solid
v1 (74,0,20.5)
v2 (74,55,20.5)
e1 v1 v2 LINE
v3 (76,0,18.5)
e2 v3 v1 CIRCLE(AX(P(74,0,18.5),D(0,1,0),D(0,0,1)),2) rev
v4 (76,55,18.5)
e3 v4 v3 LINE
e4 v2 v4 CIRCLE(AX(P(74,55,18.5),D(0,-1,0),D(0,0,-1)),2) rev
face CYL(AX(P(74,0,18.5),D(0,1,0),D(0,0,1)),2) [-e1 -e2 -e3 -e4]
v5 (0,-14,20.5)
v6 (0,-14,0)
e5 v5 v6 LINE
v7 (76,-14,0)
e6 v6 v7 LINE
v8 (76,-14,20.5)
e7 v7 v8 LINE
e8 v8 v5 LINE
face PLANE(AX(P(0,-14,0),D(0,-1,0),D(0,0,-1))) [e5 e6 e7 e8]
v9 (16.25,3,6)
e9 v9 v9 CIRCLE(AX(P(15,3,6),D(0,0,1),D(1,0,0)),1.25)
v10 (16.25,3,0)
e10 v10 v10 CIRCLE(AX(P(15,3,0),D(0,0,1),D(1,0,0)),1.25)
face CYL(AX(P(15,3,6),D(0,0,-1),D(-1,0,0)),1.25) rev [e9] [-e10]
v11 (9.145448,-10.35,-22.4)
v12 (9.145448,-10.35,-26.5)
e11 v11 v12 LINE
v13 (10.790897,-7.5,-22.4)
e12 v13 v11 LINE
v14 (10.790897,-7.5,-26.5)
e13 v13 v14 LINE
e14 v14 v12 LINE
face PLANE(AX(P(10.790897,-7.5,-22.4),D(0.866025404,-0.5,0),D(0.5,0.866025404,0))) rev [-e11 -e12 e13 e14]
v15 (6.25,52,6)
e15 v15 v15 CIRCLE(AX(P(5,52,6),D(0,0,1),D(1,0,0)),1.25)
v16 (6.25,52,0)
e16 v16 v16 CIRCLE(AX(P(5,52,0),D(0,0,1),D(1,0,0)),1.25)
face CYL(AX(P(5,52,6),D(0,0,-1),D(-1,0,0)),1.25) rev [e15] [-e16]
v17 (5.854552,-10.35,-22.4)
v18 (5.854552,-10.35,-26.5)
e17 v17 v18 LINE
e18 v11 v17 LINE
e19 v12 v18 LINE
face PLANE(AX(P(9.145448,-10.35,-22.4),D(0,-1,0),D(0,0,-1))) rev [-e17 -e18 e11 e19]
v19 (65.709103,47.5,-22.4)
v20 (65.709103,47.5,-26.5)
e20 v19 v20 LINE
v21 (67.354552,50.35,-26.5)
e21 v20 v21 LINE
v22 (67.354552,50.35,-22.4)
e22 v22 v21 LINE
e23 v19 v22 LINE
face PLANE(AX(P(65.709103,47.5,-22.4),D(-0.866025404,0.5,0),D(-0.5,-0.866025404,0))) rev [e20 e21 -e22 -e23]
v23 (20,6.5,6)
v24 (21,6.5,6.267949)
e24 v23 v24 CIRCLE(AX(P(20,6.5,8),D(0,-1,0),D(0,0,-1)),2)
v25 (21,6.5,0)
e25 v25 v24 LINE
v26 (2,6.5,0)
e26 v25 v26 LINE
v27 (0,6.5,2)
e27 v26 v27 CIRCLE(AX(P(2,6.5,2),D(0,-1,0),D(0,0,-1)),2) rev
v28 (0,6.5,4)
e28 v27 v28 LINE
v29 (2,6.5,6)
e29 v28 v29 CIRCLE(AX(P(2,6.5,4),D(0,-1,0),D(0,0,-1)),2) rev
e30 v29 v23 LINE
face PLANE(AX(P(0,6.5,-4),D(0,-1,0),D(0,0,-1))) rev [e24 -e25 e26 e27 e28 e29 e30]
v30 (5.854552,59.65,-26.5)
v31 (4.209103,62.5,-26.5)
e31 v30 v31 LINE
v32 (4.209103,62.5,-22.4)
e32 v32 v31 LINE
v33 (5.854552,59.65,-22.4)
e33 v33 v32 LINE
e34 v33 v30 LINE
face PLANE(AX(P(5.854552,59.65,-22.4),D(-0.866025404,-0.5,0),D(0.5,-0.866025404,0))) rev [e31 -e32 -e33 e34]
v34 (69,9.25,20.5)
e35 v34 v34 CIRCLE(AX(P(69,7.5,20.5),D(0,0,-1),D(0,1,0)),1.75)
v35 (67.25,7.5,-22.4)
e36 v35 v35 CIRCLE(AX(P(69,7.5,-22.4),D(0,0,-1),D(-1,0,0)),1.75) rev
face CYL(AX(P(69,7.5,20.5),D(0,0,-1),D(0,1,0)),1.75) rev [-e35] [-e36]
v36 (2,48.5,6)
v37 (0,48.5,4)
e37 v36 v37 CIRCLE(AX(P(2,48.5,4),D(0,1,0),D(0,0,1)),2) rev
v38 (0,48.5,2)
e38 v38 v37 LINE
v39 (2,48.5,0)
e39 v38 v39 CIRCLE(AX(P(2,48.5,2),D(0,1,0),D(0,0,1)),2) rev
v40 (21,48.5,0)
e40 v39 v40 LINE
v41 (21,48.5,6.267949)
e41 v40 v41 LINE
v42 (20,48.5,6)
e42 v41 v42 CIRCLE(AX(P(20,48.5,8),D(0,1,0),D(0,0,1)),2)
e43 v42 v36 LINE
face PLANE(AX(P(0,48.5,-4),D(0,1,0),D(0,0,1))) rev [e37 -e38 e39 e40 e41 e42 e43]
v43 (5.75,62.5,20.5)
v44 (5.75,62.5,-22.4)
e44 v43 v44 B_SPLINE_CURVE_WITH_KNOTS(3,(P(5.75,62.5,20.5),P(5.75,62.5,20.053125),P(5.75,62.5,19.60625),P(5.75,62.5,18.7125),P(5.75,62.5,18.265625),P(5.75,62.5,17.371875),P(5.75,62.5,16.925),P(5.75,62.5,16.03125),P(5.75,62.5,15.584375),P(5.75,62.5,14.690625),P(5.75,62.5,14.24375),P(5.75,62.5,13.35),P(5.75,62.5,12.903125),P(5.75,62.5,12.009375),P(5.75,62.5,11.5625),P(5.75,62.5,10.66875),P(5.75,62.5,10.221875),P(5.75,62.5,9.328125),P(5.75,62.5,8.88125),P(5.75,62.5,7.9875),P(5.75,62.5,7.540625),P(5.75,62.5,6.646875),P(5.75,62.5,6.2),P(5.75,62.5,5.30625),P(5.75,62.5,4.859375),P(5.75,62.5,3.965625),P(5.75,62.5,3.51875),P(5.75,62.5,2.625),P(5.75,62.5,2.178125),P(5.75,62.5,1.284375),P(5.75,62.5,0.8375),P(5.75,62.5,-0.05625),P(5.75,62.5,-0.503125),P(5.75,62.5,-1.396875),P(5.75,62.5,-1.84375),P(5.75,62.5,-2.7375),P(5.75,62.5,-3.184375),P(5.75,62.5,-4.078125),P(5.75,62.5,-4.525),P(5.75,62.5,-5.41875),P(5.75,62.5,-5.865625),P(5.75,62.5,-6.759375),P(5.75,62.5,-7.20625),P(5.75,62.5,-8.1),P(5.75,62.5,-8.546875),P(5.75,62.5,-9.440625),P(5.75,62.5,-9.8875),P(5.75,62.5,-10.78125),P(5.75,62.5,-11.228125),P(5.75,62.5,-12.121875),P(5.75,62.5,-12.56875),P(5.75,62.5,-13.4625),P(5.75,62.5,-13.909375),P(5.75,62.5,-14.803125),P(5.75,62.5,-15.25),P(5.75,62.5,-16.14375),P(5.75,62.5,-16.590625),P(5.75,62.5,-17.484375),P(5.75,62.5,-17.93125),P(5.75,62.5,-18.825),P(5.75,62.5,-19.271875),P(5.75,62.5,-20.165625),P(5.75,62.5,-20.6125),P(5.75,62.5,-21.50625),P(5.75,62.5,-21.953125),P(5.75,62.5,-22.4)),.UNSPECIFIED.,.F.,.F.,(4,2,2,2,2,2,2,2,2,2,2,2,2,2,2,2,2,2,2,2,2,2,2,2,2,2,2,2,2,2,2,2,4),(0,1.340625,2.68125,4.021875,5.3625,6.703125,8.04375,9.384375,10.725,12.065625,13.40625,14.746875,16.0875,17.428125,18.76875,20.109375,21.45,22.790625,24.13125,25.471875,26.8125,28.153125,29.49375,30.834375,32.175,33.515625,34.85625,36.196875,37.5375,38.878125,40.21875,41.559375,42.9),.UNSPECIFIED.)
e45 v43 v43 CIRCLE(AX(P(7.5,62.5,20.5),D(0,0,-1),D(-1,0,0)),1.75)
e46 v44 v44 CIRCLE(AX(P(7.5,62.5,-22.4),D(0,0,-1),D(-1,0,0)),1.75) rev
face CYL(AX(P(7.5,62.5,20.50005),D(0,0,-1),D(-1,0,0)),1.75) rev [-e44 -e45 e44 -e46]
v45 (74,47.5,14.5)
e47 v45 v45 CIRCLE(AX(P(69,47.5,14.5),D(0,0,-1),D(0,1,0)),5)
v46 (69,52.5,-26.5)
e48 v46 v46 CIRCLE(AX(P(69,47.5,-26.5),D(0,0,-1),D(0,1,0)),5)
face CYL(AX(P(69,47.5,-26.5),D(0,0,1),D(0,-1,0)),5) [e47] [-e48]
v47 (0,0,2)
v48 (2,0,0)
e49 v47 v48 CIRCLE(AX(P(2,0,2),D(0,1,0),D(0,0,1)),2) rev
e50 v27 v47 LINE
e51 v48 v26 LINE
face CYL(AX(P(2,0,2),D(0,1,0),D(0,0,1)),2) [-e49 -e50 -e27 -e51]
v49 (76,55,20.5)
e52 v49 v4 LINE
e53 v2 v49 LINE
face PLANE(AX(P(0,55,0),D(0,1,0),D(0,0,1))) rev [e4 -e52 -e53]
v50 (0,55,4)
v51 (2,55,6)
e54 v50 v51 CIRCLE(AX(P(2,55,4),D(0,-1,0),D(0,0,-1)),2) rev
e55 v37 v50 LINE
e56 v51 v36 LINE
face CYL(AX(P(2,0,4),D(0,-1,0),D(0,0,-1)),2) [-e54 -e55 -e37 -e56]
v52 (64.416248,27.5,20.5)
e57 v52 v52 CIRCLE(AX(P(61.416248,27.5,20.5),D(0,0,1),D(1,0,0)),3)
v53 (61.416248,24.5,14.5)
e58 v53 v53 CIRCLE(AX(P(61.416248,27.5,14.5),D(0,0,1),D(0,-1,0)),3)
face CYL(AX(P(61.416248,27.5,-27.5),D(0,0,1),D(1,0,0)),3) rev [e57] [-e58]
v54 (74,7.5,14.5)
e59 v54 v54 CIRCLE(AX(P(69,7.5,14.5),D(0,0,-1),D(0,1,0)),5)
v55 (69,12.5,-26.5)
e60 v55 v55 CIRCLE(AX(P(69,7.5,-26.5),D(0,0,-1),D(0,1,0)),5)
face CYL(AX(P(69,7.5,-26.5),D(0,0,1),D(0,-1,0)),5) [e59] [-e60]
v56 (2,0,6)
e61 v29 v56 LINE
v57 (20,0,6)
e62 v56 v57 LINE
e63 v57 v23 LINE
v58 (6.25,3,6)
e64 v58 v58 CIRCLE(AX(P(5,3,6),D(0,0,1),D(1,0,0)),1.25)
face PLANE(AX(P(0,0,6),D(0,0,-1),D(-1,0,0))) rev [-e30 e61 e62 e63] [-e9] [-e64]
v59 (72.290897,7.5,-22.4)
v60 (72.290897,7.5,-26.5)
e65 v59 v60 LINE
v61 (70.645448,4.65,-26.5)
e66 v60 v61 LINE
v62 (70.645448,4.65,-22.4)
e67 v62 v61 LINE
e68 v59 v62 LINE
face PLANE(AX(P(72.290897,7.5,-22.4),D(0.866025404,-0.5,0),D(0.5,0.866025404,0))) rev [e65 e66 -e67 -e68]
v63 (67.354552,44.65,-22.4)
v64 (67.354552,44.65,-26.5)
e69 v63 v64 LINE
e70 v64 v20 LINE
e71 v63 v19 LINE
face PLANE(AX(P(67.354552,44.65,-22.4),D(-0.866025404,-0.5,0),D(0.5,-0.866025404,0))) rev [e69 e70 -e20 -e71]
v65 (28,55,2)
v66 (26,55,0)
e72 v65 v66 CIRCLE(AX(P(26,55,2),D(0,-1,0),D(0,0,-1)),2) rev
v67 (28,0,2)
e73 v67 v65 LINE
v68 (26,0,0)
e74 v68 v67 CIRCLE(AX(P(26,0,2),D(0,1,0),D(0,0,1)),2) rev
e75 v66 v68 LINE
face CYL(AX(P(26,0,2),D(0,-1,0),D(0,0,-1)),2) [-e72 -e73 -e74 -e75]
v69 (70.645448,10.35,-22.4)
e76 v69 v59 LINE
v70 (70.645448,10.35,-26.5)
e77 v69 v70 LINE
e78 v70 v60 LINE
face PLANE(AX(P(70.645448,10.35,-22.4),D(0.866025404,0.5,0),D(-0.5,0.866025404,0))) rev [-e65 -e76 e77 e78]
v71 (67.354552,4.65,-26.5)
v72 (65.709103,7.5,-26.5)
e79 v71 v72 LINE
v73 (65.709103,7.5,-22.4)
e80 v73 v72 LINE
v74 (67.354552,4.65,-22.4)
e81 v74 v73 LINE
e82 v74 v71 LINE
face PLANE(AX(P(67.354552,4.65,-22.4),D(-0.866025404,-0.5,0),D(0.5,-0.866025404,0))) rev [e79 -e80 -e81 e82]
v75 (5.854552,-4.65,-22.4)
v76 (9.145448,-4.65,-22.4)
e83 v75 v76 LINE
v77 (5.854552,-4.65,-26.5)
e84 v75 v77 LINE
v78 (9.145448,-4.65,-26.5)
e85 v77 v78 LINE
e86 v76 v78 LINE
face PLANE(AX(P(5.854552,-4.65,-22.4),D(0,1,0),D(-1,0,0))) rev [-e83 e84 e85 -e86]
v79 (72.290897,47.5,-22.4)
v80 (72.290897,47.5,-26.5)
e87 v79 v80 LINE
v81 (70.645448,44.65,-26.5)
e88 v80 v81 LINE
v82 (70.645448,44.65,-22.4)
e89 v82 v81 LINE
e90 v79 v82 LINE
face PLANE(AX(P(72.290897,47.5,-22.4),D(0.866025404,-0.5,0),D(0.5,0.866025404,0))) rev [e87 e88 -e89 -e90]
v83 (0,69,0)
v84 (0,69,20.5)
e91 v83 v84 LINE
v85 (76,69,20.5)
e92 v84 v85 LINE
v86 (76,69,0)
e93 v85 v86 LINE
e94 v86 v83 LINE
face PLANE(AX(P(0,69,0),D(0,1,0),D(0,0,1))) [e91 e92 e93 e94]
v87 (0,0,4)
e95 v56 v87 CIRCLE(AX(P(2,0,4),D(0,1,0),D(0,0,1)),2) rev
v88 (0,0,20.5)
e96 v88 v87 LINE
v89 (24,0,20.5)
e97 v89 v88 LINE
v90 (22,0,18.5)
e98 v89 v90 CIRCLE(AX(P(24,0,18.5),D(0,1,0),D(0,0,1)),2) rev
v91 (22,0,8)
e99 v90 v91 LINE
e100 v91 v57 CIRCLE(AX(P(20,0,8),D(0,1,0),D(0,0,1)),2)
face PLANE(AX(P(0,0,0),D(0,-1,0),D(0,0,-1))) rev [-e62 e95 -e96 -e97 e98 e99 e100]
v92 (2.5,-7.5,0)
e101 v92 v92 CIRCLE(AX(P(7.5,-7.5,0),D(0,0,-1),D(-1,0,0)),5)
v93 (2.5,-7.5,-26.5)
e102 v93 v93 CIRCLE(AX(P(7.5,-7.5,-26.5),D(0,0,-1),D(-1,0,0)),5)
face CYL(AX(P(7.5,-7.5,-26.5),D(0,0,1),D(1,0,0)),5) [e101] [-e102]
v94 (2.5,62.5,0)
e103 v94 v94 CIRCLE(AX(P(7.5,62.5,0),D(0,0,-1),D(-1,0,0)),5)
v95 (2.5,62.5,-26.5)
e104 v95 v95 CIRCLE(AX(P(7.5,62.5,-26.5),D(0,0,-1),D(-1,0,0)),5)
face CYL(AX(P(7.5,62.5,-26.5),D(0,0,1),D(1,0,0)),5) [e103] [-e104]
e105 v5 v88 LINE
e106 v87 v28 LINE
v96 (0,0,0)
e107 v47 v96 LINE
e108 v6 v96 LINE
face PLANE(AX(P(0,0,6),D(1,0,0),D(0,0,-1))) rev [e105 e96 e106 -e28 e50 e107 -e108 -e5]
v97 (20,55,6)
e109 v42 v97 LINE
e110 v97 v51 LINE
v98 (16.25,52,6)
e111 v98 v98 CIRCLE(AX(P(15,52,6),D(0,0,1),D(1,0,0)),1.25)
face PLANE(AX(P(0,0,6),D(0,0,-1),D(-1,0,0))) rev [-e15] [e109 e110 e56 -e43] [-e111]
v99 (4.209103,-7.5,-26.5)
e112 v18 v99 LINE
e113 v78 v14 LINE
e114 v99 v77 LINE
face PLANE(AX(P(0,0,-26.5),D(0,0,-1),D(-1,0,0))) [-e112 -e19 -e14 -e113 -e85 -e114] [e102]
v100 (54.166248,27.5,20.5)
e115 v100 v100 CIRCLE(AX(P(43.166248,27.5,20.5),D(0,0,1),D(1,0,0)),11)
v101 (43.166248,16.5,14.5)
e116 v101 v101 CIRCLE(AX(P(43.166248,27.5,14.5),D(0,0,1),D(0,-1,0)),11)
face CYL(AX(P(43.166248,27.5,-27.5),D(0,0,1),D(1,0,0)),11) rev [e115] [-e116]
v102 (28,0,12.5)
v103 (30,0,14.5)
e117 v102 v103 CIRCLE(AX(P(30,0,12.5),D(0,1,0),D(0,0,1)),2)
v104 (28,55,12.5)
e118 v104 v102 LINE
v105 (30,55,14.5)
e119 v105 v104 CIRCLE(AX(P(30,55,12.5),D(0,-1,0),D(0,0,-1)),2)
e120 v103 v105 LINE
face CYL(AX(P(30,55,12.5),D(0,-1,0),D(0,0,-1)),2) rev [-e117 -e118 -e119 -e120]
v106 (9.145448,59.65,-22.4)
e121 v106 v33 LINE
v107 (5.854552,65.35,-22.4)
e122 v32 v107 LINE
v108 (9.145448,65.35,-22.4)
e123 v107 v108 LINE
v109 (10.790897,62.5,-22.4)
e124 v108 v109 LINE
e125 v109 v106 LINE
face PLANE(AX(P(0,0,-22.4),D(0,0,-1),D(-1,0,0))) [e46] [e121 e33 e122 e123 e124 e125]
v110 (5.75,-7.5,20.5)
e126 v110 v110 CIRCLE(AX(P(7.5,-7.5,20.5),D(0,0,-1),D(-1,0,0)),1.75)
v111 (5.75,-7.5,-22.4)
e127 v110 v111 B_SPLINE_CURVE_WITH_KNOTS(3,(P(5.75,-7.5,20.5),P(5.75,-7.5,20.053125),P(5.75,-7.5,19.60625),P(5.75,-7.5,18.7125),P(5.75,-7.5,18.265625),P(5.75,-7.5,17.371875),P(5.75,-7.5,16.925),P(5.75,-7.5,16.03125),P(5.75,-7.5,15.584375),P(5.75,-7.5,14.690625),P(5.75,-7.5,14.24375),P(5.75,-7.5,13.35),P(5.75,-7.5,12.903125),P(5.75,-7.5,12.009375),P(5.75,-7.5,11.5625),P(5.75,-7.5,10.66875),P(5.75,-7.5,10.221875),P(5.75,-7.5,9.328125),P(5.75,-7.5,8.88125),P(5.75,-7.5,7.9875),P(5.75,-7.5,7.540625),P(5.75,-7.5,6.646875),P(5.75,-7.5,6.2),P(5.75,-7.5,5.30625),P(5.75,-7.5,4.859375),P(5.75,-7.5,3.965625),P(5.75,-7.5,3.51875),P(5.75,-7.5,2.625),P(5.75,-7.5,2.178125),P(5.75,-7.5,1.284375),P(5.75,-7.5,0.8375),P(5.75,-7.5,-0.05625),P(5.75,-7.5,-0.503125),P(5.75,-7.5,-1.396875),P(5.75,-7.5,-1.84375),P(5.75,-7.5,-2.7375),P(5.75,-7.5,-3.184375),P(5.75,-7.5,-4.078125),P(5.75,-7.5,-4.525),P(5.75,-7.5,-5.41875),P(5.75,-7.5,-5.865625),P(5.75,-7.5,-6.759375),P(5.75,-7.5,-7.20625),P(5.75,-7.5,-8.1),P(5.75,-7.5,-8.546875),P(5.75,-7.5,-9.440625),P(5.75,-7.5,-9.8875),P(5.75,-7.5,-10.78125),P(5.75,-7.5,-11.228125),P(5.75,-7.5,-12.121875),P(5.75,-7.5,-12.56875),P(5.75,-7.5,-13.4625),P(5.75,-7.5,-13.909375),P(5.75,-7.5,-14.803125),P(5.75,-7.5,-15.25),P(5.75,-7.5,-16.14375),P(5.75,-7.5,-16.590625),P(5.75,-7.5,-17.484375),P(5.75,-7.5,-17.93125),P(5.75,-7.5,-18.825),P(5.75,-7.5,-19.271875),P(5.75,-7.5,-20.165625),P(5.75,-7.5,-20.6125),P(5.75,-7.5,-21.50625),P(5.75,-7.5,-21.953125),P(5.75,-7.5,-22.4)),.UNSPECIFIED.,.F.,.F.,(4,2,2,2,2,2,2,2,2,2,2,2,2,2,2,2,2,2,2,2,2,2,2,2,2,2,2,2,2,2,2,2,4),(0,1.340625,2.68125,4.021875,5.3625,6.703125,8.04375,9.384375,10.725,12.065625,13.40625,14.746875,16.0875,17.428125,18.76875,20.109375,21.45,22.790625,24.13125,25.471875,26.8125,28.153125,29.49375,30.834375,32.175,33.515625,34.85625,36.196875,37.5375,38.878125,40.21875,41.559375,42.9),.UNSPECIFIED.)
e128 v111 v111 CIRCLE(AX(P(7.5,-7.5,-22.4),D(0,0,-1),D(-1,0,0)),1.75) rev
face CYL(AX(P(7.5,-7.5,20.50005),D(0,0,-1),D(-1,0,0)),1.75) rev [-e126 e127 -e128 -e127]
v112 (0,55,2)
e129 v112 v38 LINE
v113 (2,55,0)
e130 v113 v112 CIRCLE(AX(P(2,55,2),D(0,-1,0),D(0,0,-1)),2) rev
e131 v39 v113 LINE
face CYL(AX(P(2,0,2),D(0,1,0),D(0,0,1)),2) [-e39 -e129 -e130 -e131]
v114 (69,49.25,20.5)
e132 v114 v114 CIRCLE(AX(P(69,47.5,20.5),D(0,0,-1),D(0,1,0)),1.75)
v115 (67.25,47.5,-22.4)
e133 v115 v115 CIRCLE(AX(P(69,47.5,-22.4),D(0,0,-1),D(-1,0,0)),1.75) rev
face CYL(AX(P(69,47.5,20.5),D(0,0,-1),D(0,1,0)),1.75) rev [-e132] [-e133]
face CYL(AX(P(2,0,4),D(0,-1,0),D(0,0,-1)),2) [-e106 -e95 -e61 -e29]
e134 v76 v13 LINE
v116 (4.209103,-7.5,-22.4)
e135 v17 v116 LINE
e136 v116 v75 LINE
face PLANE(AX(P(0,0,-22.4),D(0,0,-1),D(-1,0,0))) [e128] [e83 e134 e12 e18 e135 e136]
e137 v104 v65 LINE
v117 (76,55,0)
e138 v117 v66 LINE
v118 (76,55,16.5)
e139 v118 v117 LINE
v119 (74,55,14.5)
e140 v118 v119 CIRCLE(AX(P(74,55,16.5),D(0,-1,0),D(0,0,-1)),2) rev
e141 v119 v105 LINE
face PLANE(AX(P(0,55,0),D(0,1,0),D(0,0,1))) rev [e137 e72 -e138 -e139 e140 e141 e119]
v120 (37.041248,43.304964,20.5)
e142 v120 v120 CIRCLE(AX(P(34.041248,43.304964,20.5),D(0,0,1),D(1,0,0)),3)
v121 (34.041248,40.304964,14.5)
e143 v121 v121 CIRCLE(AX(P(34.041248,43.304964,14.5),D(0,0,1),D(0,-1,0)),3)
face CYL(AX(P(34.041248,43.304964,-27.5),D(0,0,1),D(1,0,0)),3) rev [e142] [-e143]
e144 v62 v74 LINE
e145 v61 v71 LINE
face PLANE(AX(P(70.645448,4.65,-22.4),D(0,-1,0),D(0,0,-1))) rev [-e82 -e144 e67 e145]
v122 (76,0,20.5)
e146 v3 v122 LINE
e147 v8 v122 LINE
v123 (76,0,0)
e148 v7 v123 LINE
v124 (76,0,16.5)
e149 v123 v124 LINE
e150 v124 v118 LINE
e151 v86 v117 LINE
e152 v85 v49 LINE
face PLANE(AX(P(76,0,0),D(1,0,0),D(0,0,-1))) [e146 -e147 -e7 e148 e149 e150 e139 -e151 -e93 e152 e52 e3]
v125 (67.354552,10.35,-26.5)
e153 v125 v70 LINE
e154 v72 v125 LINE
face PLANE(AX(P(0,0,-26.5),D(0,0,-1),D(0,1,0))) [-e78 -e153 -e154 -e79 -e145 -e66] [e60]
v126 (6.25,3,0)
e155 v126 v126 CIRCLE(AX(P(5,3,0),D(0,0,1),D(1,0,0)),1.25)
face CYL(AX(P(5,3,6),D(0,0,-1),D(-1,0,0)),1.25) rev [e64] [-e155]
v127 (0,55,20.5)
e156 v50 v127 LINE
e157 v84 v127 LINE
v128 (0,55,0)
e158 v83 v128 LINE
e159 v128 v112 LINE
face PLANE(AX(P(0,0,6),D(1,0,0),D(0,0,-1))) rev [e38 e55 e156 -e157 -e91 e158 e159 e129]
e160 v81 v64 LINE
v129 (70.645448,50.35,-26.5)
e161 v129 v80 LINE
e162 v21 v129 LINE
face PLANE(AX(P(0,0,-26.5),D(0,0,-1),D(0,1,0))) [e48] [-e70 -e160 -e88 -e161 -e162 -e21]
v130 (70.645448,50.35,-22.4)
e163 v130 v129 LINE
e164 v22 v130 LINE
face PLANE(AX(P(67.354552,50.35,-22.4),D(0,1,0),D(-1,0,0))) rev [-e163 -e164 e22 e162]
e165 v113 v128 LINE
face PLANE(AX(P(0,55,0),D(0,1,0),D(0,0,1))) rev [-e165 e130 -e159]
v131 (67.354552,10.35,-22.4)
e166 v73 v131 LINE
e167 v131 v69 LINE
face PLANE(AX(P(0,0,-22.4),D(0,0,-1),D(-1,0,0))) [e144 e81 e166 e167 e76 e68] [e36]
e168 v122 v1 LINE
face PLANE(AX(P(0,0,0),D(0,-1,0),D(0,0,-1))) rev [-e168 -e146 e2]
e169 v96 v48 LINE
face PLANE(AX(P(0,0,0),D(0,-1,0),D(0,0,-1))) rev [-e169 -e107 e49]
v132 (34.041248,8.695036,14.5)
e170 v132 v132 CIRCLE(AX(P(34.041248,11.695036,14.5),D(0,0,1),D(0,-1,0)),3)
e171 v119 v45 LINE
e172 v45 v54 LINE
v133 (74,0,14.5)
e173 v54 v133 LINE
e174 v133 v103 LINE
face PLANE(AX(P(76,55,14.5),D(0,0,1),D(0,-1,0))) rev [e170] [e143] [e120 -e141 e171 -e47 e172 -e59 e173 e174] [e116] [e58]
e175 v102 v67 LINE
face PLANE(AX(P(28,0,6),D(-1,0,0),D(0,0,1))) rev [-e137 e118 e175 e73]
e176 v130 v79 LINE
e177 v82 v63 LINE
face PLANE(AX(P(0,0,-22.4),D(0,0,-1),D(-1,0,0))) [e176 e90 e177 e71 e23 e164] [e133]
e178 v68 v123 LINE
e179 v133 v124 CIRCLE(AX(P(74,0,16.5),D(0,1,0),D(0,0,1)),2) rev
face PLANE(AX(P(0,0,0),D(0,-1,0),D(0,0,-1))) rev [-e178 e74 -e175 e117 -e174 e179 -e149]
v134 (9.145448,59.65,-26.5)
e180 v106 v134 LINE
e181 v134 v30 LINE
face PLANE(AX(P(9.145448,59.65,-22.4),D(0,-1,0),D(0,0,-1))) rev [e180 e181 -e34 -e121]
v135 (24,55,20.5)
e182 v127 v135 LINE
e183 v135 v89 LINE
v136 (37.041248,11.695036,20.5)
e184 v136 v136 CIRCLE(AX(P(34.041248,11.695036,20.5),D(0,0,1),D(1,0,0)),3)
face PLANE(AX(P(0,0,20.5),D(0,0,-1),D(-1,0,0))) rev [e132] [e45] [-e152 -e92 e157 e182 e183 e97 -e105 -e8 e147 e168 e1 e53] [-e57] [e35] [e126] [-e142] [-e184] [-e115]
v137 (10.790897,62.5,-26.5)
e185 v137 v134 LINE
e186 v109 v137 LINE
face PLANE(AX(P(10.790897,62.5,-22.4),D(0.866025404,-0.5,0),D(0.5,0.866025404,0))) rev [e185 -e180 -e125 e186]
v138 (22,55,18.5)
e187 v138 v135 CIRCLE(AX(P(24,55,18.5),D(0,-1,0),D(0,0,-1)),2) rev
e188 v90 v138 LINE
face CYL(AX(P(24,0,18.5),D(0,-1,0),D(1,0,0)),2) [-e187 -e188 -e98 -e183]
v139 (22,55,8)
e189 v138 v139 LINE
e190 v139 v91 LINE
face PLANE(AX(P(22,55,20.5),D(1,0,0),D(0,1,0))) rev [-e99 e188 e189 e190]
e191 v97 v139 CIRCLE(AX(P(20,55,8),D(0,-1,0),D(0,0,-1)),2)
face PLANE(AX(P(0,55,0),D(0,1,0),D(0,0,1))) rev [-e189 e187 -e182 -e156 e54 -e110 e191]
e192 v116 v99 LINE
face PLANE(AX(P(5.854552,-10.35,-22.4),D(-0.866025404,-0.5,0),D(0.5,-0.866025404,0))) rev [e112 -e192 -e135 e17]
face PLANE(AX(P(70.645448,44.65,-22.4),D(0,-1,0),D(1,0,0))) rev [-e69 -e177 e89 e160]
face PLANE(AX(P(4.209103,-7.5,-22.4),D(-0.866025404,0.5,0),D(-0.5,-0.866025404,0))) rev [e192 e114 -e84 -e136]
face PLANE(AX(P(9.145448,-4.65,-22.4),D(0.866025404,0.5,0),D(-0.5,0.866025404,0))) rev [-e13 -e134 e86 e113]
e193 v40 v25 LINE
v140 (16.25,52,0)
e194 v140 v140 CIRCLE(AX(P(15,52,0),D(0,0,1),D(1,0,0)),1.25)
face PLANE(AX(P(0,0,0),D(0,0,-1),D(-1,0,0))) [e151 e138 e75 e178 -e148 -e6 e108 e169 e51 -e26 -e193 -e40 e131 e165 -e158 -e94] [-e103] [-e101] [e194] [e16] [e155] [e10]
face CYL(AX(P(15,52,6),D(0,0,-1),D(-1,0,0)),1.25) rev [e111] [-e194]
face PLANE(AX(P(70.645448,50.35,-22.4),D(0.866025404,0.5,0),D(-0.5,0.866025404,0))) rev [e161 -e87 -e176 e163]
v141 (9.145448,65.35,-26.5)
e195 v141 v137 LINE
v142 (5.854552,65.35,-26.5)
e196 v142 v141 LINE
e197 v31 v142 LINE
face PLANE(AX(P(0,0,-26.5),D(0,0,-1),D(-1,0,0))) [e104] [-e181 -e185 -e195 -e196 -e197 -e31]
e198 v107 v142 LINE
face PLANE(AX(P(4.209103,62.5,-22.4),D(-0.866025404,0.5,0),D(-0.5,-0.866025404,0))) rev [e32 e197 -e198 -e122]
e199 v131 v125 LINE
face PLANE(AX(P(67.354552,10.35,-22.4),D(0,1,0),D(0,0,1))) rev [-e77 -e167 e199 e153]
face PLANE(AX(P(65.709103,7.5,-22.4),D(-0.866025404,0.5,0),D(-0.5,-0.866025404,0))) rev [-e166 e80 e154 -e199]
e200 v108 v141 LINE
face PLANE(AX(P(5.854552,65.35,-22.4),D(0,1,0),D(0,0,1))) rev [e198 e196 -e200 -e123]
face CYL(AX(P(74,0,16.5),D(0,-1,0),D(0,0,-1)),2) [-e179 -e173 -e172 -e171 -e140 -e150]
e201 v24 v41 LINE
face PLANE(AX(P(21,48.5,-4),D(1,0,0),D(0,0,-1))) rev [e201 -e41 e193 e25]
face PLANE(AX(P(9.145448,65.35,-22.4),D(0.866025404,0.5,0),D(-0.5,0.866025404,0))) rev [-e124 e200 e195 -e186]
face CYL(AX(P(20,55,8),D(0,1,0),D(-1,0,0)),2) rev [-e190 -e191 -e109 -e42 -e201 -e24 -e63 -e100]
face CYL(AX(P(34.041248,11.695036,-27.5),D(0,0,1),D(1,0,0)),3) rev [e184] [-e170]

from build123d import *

# Parameters (mm, degrees)
SKETCH1_W               = 28
SKETCH1_H               = 55
SKETCH1_R               = 1.25
BOSS_EXTRUDE1_DEPTH     = 6
SKETCH2_W               = 6
SKETCH2_H               = 55
BOSS_EXTRUDE2_DEPTH     = 14.5
SKETCH3_W               = 6
SKETCH3_H               = 55
BOSS_EXTRUDE3_DEPTH     = 48
SKETCH4_R               = 3
SKETCH4_R_2             = 11
CUT_EXTRUDE1_DEPTH      = 48
FILLET4_R               = 2
SKETCH5_W               = 21
SKETCH5_H               = 42
CUT_EXTRUDE2_DEPTH      = 10
FILLET5_R               = 2
ESQUISSE2_R             = 5
BOSS_EXTRU_3_DEPTH      = 41
ESQUISSE3_R             = 1.75
ENL_V_MAT_EXTRU_1_DEPTH = 105.928547117
ESQUISSE4_W             = 76
ESQUISSE4_H             = 20.5
BOSS_EXTRU_4_DEPTH      = 14
ESQUISSE5_W             = 76
ESQUISSE5_H             = 20.5
BOSS_EXTRU_5_DEPTH      = 14
ESQUISSE7_R             = 5
BOSS_EXTRU_8_DEPTH      = 26.5
ESQUISSE10_R            = 1.75
ENL_V_MAT_EXTRU_2_DEPTH = 113.898184219
ENL_V_MAT_EXTRU_3_DEPTH = 4.1
ENL_V_MAT_EXTRU_4_DEPTH = 4.1


with BuildPart() as part:
    # Sketch1 → Boss-Extrude1 (new body)
    with BuildSketch(Plane.XY):
        with Locations((14, 27.5)):
            Rectangle(SKETCH1_W, SKETCH1_H)
        with Locations((5, 52)):
            Circle(SKETCH1_R, mode=Mode.SUBTRACT)
        with Locations((15, 52)):
            Circle(SKETCH1_R, mode=Mode.SUBTRACT)
        with Locations((5, 3)):
            Circle(SKETCH1_R, mode=Mode.SUBTRACT)
        with Locations((15, 3)):
            Circle(SKETCH1_R, mode=Mode.SUBTRACT)
    extrude(amount=BOSS_EXTRUDE1_DEPTH)

    # Sketch2 → Boss-Extrude2 (add)
    with BuildSketch(Plane.XY.offset(6)):
        with Locations((25, 27.5)):
            Rectangle(SKETCH2_W, SKETCH2_H)
    extrude(amount=BOSS_EXTRUDE2_DEPTH)

    # Sketch3 → Boss-Extrude3 (add)
    with BuildSketch(Plane(origin=(28, 0, 0), x_dir=(0, 0, -1), z_dir=(1, 0, 0))):
        with Locations((-17.5, 27.5)):
            Rectangle(SKETCH3_W, SKETCH3_H)
    extrude(amount=BOSS_EXTRUDE3_DEPTH)

    # Sketch4 → Cut-Extrude1 (cut)
    with BuildSketch(Plane.XY.offset(20.5)):
        with Locations((61.416247904, 27.5)):
            Circle(SKETCH4_R)
        with Locations((34.041247904, 11.695036381)):
            Circle(SKETCH4_R)
        with Locations((34.041247904, 43.304963619)):
            Circle(SKETCH4_R)
        with Locations((43.166247904, 27.5)):
            Circle(SKETCH4_R_2)
    extrude(amount=-CUT_EXTRUDE1_DEPTH, mode=Mode.SUBTRACT)

    # Fillet4
    fillet4_edges = [part.edges().sort_by_distance(p)[0] for p in [
        (22, 27.5, 20.5),
        (0, 27.5, 6),
        (0, 27.5, 0),
        (76, 27.5, 14.5),
        (28, 27.5, 14.5),
        (28, 27.5, 0),
        (76, 27.5, 20.5),
    ]]
    fillet(fillet4_edges, radius=FILLET4_R)

    # Sketch5 → Cut-Extrude2 (cut)
    with BuildSketch(Plane.XY.offset(6)):
        with Locations((10.5, 27.5)):
            Rectangle(SKETCH5_W, SKETCH5_H)
    extrude(amount=-CUT_EXTRUDE2_DEPTH, mode=Mode.SUBTRACT)

    # Fillet5
    # the kernel refuses this fillet: 2 mm, written as the material it adds along each edge
    with BuildSketch(Plane(origin=(22, 55, 6), x_dir=(-1, 0, 0), z_dir=(0, -1, 0))) as fillet5_piece_1_section:
        with BuildLine():
            CenterArc((FILLET5_R, -FILLET5_R), FILLET5_R, 90, 90)
            Line((0, -FILLET5_R), (0, 0))
            Line((0, 0), (FILLET5_R, 0))
        make_face()
    fillet5_piece_1 = extrude(amount=55, mode=Mode.PRIVATE)
    fillet5_piece_1 = split(fillet5_piece_1, bisect_by=Plane(origin=(21, 51.75, 6.048016763), z_dir=(-1, 0, 0)), keep=Keep.TOP, mode=Mode.PRIVATE)
    fillet5_piece_1 = split(fillet5_piece_1, bisect_by=Plane(origin=(20.673498431, 48.5, 6.048016763), z_dir=(0, 1, 0)), keep=Keep.TOP, mode=Mode.PRIVATE)
    add(fillet5_piece_1)
    with BuildSketch(Plane(origin=(22, 55, 6), x_dir=(-1, 0, 0), z_dir=(0, -1, 0))) as fillet5_piece_2_section:
        with BuildLine():
            CenterArc((FILLET5_R, -FILLET5_R), FILLET5_R, 90, 90)
            Line((0, -FILLET5_R), (0, 0))
            Line((0, 0), (FILLET5_R, 0))
        make_face()
    fillet5_piece_2 = extrude(amount=55, mode=Mode.PRIVATE)
    fillet5_piece_2 = split(fillet5_piece_2, bisect_by=Plane(origin=(21, 51.75, 6.51024012), z_dir=(1, 0, 0)), keep=Keep.TOP, mode=Mode.PRIVATE)
    fillet5_piece_2 = split(fillet5_piece_2, bisect_by=Plane(origin=(21.671216471, 48.5, 6.51024012), z_dir=(0, 1, 0)), keep=Keep.TOP, mode=Mode.PRIVATE)
    add(fillet5_piece_2)
    with BuildSketch(Plane(origin=(22, 55, 6), x_dir=(-1, 0, 0), z_dir=(0, -1, 0))) as fillet5_piece_3_section:
        with BuildLine():
            CenterArc((FILLET5_R, -FILLET5_R), FILLET5_R, 90, 90)
            Line((0, -FILLET5_R), (0, 0))
            Line((0, 0), (FILLET5_R, 0))
        make_face()
    fillet5_piece_3 = extrude(amount=55, mode=Mode.PRIVATE)
    fillet5_piece_3 = split(fillet5_piece_3, bisect_by=Plane(origin=(21.671216471, 6.5, 6.51024012), z_dir=(0, 1, 0)), keep=Keep.TOP, mode=Mode.PRIVATE)
    fillet5_piece_3 = split(fillet5_piece_3, bisect_by=Plane(origin=(21, 27.5, 6.51024012), z_dir=(1, 0, 0)), keep=Keep.TOP, mode=Mode.PRIVATE)
    fillet5_piece_3 = split(fillet5_piece_3, bisect_by=Plane(origin=(21.671216471, 48.5, 6.51024012), z_dir=(0, -1, 0)), keep=Keep.TOP, mode=Mode.PRIVATE)
    add(fillet5_piece_3)
    with BuildSketch(Plane(origin=(22, 55, 6), x_dir=(-1, 0, 0), z_dir=(0, -1, 0))) as fillet5_piece_4_section:
        with BuildLine():
            CenterArc((FILLET5_R, -FILLET5_R), FILLET5_R, 90, 90)
            Line((0, -FILLET5_R), (0, 0))
            Line((0, 0), (FILLET5_R, 0))
        make_face()
    fillet5_piece_4 = extrude(amount=55, mode=Mode.PRIVATE)
    fillet5_piece_4 = split(fillet5_piece_4, bisect_by=Plane(origin=(20.673498431, 6.5, 6.048016763), z_dir=(0, -1, 0)), keep=Keep.TOP, mode=Mode.PRIVATE)
    fillet5_piece_4 = split(fillet5_piece_4, bisect_by=Plane(origin=(21, 3.25, 6.048016763), z_dir=(-1, 0, 0)), keep=Keep.TOP, mode=Mode.PRIVATE)
    add(fillet5_piece_4)
    with BuildSketch(Plane(origin=(22, 55, 6), x_dir=(-1, 0, 0), z_dir=(0, -1, 0))) as fillet5_piece_5_section:
        with BuildLine():
            CenterArc((FILLET5_R, -FILLET5_R), FILLET5_R, 90, 90)
            Line((0, -FILLET5_R), (0, 0))
            Line((0, 0), (FILLET5_R, 0))
        make_face()
    fillet5_piece_5 = extrude(amount=55, mode=Mode.PRIVATE)
    fillet5_piece_5 = split(fillet5_piece_5, bisect_by=Plane(origin=(21.671216471, 6.5, 6.51024012), z_dir=(0, -1, 0)), keep=Keep.TOP, mode=Mode.PRIVATE)
    fillet5_piece_5 = split(fillet5_piece_5, bisect_by=Plane(origin=(21, 3.25, 6.51024012), z_dir=(1, 0, 0)), keep=Keep.TOP, mode=Mode.PRIVATE)
    add(fillet5_piece_5)

    # Esquisse2 → Boss.-Extru.3 (add)
    with BuildSketch(Plane(origin=(0, 0, 14.5), x_dir=(-1, 0, 0), z_dir=(0, 0, -1))):
        with Locations(Location((-69, 47.5, 0), (0, 0, 180))):
            Circle(ESQUISSE2_R)
        with Locations(Location((-69, 7.5, 0), (0, 0, 180))):
            Circle(ESQUISSE2_R)
    extrude(amount=BOSS_EXTRU_3_DEPTH)

    # Esquisse3 → Enlèv. mat.-Extru.1 (cut, through all)
    with BuildSketch(Plane(origin=(0, 0, -26.5), x_dir=(-1, 0, 0), z_dir=(0, 0, -1))):
        with Locations(Location((-69, 7.5, 0), (0, 0, 90))):
            Circle(ESQUISSE3_R)
        with Locations(Location((-69, 47.5, 0), (0, 0, 90))):
            Circle(ESQUISSE3_R)
    extrude(amount=-ENL_V_MAT_EXTRU_1_DEPTH, mode=Mode.SUBTRACT)

    # Esquisse4 → Boss.-Extru.4 (add)
    with BuildSketch(Plane(origin=(0, 55, 0), x_dir=(1, 0, 0), z_dir=(0, 1, 0))):
        with Locations((38, -10.25)):
            Rectangle(ESQUISSE4_W, ESQUISSE4_H)
    extrude(amount=BOSS_EXTRU_4_DEPTH)

    # Esquisse5 → Boss.-Extru.5 (add)
    with BuildSketch(Plane.XZ):
        with Locations((38, 10.25)):
            Rectangle(ESQUISSE5_W, ESQUISSE5_H)
    extrude(amount=BOSS_EXTRU_5_DEPTH)

    # Esquisse7 → Boss.-Extru.8 (add)
    with BuildSketch(Plane(origin=(0, 0, 0), x_dir=(-1, 0, 0), z_dir=(0, 0, -1))):
        with Locations((-7.5, -7.5)):
            Circle(ESQUISSE7_R)
        with Locations((-7.5, 62.5)):
            Circle(ESQUISSE7_R)
    extrude(amount=BOSS_EXTRU_8_DEPTH)

    # Esquisse10 → Enlèv. mat.-Extru.2 (cut, through all)
    with BuildSketch(Plane(origin=(0, 0, -26.5), x_dir=(-1, 0, 0), z_dir=(0, 0, -1))):
        with Locations((-7.5, 62.5)):
            Circle(ESQUISSE10_R)
        with Locations((-7.5, -7.5)):
            Circle(ESQUISSE10_R)
    extrude(amount=-ENL_V_MAT_EXTRU_2_DEPTH, mode=Mode.SUBTRACT)

    # Esquisse11 → Enlèv. mat.-Extru.3 (cut)
    with BuildSketch(Plane(origin=(0, 0, -26.5), x_dir=(-1, 0, 0), z_dir=(0, 0, -1))):
        Polygon((-9.145448267, -4.65), (-10.790896534, -7.5), (-9.145448267, -10.35), (-5.854551733, -10.35), (-4.209103466, -7.5), (-5.854551733, -4.65), align=None)
    extrude(amount=-ENL_V_MAT_EXTRU_3_DEPTH, mode=Mode.SUBTRACT)

    # Esquisse12 → Enlèv. mat.-Extru.4 (cut)
    with BuildSketch(Plane(origin=(0, 0, -26.5), x_dir=(-1, 0, 0), z_dir=(0, 0, -1))):
        Polygon((-9.145448267, 65.35), (-10.790896534, 62.5), (-9.145448267, 59.65), (-5.854551733, 59.65), (-4.209103466, 62.5), (-5.854551733, 65.35), align=None)
        Polygon((-70.645448267, 50.35), (-72.290896534, 47.5), (-70.645448267, 44.65), (-67.354551733, 44.65), (-65.709103466, 47.5), (-67.354551733, 50.35), align=None)
        Polygon((-70.645448267, 10.35), (-72.290896534, 7.5), (-70.645448267, 4.65), (-67.354551733, 4.65), (-65.709103466, 7.5), (-67.354551733, 10.35), align=None)
    extrude(amount=-ENL_V_MAT_EXTRU_4_DEPTH, mode=Mode.SUBTRACT)


solid = part.part
